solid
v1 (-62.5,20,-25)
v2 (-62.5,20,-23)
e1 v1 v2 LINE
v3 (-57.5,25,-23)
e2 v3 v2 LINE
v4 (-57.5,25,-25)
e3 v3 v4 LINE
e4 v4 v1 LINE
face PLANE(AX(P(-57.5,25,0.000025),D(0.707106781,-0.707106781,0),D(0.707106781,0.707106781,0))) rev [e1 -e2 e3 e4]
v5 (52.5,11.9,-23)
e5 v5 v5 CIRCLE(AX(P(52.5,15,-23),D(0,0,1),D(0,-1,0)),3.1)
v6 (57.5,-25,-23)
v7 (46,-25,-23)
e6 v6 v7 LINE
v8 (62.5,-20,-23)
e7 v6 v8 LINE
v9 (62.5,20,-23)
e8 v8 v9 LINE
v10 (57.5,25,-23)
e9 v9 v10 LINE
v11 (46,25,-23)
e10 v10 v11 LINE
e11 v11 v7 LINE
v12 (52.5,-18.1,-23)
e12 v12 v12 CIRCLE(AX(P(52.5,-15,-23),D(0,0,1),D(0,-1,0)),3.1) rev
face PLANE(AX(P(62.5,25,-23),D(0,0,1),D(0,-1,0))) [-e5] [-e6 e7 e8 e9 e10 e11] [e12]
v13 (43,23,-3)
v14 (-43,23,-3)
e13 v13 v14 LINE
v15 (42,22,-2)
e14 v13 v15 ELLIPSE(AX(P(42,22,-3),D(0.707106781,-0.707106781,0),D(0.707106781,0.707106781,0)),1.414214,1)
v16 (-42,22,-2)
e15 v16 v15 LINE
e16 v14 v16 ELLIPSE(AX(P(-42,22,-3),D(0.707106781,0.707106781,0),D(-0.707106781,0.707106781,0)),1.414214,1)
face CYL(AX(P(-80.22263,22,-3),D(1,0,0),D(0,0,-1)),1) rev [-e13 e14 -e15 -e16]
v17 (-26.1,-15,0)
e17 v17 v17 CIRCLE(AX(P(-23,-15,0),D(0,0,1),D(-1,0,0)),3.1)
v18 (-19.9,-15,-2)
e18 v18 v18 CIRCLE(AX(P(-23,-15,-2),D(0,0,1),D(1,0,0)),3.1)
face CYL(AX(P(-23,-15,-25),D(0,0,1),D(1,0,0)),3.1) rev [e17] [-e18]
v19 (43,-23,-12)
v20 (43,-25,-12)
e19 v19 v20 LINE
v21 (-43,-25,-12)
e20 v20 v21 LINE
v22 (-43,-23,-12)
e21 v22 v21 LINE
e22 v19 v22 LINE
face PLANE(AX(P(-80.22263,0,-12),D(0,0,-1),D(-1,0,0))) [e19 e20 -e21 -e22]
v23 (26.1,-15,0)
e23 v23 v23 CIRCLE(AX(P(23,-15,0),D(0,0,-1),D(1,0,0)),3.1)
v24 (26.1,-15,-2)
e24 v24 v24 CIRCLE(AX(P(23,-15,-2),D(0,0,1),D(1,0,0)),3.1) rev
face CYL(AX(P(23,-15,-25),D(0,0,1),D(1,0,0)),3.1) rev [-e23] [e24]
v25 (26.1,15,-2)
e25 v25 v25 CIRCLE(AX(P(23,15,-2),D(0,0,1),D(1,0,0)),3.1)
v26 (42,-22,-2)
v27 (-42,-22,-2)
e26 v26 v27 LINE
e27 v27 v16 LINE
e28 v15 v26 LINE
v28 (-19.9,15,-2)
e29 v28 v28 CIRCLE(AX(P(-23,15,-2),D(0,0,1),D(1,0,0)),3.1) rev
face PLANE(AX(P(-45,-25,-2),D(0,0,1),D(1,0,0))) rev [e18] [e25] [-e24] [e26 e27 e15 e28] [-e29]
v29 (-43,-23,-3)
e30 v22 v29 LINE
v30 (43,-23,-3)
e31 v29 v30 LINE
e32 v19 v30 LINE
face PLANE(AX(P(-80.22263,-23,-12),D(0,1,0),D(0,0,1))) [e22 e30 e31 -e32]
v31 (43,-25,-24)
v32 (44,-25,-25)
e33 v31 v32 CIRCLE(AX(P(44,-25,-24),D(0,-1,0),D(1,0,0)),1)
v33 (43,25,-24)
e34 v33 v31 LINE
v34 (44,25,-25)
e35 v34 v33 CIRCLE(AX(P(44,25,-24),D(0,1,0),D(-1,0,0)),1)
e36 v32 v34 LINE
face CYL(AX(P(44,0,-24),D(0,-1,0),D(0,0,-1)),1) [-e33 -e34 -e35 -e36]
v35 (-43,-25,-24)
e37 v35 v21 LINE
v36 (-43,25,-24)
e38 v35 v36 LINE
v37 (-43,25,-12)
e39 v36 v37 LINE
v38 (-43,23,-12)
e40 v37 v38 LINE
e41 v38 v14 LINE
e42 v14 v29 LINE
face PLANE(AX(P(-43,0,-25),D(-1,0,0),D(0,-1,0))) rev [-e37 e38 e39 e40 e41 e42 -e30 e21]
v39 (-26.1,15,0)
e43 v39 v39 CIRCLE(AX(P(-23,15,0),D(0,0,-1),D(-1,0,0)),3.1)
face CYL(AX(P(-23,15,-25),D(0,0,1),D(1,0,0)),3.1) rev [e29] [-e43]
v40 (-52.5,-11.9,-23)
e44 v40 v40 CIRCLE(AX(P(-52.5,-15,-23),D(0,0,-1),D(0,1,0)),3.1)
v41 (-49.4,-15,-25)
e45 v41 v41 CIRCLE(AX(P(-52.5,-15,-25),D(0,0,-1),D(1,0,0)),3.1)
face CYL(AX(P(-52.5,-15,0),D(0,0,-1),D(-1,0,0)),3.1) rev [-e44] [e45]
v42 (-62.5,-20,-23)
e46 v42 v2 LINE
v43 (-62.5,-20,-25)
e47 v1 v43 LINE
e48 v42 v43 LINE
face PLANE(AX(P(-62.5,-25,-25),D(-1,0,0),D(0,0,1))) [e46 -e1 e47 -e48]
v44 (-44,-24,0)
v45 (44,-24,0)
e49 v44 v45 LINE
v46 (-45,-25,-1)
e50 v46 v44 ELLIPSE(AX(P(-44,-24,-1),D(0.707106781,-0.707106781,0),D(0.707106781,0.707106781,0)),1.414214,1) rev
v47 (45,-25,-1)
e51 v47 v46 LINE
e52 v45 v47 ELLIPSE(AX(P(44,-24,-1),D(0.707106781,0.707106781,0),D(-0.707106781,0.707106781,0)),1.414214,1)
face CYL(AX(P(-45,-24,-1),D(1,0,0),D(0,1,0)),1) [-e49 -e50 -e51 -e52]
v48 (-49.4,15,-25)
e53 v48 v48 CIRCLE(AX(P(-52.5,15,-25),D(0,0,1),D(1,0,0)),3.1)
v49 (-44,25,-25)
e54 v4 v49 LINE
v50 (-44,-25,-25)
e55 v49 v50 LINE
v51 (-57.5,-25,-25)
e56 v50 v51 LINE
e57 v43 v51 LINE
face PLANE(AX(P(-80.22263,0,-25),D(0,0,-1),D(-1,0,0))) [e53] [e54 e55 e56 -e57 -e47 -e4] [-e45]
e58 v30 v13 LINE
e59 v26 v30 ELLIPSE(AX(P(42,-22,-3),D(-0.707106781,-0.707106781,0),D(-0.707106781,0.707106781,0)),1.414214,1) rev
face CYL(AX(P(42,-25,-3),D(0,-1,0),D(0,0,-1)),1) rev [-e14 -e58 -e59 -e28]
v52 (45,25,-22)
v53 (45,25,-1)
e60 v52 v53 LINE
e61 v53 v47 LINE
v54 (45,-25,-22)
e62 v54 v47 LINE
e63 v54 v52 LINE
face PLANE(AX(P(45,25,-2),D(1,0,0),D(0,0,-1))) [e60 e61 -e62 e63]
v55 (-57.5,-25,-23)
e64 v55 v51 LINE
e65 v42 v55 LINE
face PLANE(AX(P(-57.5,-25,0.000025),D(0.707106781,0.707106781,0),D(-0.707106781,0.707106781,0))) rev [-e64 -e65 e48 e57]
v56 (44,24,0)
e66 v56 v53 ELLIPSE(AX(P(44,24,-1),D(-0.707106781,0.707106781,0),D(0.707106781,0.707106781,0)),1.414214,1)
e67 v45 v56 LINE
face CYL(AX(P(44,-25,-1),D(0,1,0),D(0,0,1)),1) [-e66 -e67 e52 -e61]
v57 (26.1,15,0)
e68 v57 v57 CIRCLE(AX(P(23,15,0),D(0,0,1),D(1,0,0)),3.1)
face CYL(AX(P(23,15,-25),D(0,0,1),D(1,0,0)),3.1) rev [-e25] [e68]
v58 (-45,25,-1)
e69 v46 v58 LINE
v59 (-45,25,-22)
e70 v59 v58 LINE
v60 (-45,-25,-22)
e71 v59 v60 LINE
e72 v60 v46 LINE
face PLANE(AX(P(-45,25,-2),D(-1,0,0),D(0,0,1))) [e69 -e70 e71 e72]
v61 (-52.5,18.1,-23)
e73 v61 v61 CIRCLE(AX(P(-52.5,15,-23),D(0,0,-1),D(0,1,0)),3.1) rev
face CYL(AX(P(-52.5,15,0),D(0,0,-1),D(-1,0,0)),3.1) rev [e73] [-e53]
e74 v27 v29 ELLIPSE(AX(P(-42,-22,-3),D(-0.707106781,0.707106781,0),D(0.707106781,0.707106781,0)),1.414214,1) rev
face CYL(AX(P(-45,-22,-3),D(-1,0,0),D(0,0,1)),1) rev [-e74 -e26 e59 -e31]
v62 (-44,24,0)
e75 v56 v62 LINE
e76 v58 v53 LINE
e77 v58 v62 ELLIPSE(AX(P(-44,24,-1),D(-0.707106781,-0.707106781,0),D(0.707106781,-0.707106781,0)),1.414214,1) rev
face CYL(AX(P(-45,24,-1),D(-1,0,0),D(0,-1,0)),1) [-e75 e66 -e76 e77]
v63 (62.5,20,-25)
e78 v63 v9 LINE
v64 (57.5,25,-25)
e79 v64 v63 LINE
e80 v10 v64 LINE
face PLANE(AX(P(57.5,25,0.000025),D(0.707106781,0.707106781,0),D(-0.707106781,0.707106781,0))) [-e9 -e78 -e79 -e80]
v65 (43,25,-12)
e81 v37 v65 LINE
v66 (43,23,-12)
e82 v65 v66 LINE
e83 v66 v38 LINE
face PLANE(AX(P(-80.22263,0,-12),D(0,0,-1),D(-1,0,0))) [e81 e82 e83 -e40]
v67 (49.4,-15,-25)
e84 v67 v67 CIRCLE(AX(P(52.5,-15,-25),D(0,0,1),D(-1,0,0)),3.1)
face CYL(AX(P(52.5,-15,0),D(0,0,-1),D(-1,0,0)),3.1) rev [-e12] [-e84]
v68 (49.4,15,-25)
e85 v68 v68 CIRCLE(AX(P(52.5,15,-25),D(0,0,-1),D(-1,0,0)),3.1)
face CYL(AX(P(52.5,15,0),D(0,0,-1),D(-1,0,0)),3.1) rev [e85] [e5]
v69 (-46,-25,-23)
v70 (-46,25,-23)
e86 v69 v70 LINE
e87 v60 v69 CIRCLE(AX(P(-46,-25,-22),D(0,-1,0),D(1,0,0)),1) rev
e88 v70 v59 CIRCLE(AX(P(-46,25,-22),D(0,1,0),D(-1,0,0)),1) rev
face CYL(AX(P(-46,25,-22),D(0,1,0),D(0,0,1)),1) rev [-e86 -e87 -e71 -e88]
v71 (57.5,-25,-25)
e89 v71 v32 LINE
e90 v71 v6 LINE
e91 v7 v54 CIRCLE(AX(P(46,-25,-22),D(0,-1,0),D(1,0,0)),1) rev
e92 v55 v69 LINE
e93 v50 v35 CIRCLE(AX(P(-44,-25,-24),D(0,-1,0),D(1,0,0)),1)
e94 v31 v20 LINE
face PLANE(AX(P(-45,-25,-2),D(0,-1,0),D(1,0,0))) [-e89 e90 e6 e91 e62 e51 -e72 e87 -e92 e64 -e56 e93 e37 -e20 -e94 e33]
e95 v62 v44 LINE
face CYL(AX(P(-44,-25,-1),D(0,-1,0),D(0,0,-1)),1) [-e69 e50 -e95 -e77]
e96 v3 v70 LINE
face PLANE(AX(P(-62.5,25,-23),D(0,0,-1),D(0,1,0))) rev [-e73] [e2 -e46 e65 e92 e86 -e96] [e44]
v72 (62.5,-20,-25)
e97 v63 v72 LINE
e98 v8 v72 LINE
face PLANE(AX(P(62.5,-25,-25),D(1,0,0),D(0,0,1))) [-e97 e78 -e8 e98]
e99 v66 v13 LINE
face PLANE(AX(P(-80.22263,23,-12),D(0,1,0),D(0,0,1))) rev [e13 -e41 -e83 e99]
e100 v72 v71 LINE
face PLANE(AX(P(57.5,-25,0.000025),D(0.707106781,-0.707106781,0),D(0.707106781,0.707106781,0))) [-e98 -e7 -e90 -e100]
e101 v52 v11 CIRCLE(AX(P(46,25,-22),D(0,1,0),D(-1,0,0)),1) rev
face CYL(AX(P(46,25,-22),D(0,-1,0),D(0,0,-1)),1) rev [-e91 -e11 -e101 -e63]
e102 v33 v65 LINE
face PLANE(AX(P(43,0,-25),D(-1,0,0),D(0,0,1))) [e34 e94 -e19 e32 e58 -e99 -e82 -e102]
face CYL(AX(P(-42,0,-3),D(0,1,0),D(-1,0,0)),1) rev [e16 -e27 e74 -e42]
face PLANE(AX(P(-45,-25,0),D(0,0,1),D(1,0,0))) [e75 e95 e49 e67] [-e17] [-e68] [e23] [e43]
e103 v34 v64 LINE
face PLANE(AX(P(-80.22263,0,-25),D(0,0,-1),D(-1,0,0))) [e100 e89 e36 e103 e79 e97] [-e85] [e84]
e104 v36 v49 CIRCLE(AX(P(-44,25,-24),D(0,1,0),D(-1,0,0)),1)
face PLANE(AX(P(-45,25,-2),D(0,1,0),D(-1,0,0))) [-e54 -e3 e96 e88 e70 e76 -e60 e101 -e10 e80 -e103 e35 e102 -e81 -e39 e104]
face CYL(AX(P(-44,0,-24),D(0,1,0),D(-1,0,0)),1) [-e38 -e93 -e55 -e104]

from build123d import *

# Parameters (mm, degrees)
SKETCH_1_W               = 90
SKETCH_1_H               = 50
SM_BASE_FLANGE_1_DEPTH   = 2
EXTRUDE_1_DEPTH          = 23
SKETCH_5_3_W             = 86
SKETCH_5_3_H             = 2
EXTRUDE_2_DEPTH          = 10
SKETCH_10_W              = 2
SKETCH_10_H              = 50
EXTRUDE_3_DEPTH          = 17.5
CUT_EXTRUDE_1_DEPTH      = 72.807033082
FILLET_1_R               = 1
SKETCH_12_R              = 3.1
CUT_EXTRUDE_2_DEPTH      = 72.807033082
SKETCH_13_R              = 3.1
CUT_EXTRUDE_3_DEPTH      = 72.807033082
MIRROR_5_COPY_1_SKETCH_R = 3.1
MIRROR_5_COPY_1_DEPTH    = 72.807033082
MIRROR_5_COPY_2_SKETCH_R = 3.1
MIRROR_5_COPY_2_DEPTH    = 72.807033082


# Sheet-metal steps are written as plain solids
with BuildPart() as part:
    # Sketch 1 → 基体-法兰1 (new body)
    with BuildSketch(Plane.XY):
        Rectangle(SKETCH_1_W, SKETCH_1_H)
    extrude(amount=-SM_BASE_FLANGE_1_DEPTH)

    # 草图5 → 凸台-拉伸1 (add)
    with BuildSketch(Plane(origin=(0, 0, -2), x_dir=(-1, 0, 0), z_dir=(0, 0, -1))):
        Polygon((-43, 25), (-45, 25), (-45, -25), (-43, -25), (-43, -23), (-43, 23), align=None)
        Polygon((45, 25), (43, 25), (43, 23), (43, -23), (43, -25), (45, -25), align=None)
    extrude(amount=EXTRUDE_1_DEPTH)

    # 草图5<3> → 凸台-拉伸2 (add)
    with BuildSketch(Plane(origin=(0, 0, -2), x_dir=(-1, 0, 0), z_dir=(0, 0, -1))):
        with Locations((0, 24)):
            Rectangle(SKETCH_5_3_W, SKETCH_5_3_H)
        with Locations((0, -24)):
            Rectangle(SKETCH_5_3_W, SKETCH_5_3_H)
    extrude(amount=EXTRUDE_2_DEPTH)

    # 草图10 → 凸台-拉伸3 (add)
    with BuildSketch(Plane.ZY.offset(45)):
        with Locations((-24, 0)):
            Rectangle(SKETCH_10_W, SKETCH_10_H)
    extrude_3 = extrude(amount=EXTRUDE_3_DEPTH)

    # 草图11 → 切除-拉伸1 (cut, through all)
    with BuildSketch(Plane(origin=(0, 0, -25), x_dir=(-1, 0, 0), z_dir=(0, 0, -1))):
        Polygon((57.5, 25), (62.5, 20), (62.5, 25), align=None)
        Polygon((57.5, -25), (62.5, -20), (62.5, -25), align=None)
    cut_extrude_1 = extrude(amount=-CUT_EXTRUDE_1_DEPTH, mode=Mode.SUBTRACT)

    # 镜向3: 凸台-拉伸3, 切除-拉伸1 across plane
    add(extrude_3.mirror(Plane(origin=(0, 0, 0), x_dir=(0, 0, 1), z_dir=(1, 0, 0))))
    add(cut_extrude_1.mirror(Plane(origin=(0, 0, 0), x_dir=(0, 0, 1), z_dir=(1, 0, 0))), mode=Mode.SUBTRACT)

    # 圆角1
    fillet_1_edges = [part.edges().sort_by_distance(p)[0] for p in [
        (-43, 0, -25),
        (-43, 0, -2),
        (43, 0, -2),
        (0, 23, -2),
        (0, -23, -2),
        (-45, 0, -23),
        (45, 0, -23),
        (0, 25, 0),
        (45, 0, 0),
        (0, -25, 0),
        (-45, 0, 0),
        (43, 0, -25),
    ]]
    fillet(fillet_1_edges, radius=FILLET_1_R)

    # 草图12 → 切除-拉伸2 (cut, through all)
    with BuildSketch(Plane(origin=(0, 0, -25), x_dir=(-1, 0, 0), z_dir=(0, 0, -1))):
        with Locations((-52.5, 15)):
            Circle(SKETCH_12_R)
    cut_extrude_2 = extrude(amount=-CUT_EXTRUDE_2_DEPTH, mode=Mode.SUBTRACT)

    # 草图13 → 切除-拉伸3 (cut, through all)
    with BuildSketch(Plane.XY):
        with Locations((23, 15)):
            Circle(SKETCH_13_R)
    cut_extrude_3 = extrude(amount=-CUT_EXTRUDE_3_DEPTH, mode=Mode.SUBTRACT)

    # 镜向4: 切除-拉伸2, 切除-拉伸3 across plane
    add(cut_extrude_2.mirror(Plane.ZX), mode=Mode.SUBTRACT)
    add(cut_extrude_3.mirror(Plane.ZX), mode=Mode.SUBTRACT)

    # 镜向5: 切除-拉伸2, 切除-拉伸3 across plane
    add(cut_extrude_2.mirror(Plane(origin=(0, 0, 0), x_dir=(0, 0, 1), z_dir=(1, 0, 0))), mode=Mode.SUBTRACT)
    add(cut_extrude_3.mirror(Plane(origin=(0, 0, 0), x_dir=(0, 0, 1), z_dir=(1, 0, 0))), mode=Mode.SUBTRACT)

    # 镜向5 copy 1 sketch → 镜向5 copy 1 (cut, through all)
    with BuildSketch(Plane(origin=(0, 0, -25), x_dir=(1, 0, 0), z_dir=(0, 0, -1))):
        with Locations((-52.5, 15)):
            Circle(MIRROR_5_COPY_1_SKETCH_R)
    extrude(amount=-MIRROR_5_COPY_1_DEPTH, mode=Mode.SUBTRACT)

    # 镜向5 copy 2 sketch → 镜向5 copy 2 (cut, through all)
    with BuildSketch(Plane(origin=(0, 0, 0), x_dir=(-1, 0, 0), z_dir=(0, 0, 1))):
        with Locations((23, 15)):
            Circle(MIRROR_5_COPY_2_SKETCH_R)
    extrude(amount=-MIRROR_5_COPY_2_DEPTH, mode=Mode.SUBTRACT)


solid = part.part
